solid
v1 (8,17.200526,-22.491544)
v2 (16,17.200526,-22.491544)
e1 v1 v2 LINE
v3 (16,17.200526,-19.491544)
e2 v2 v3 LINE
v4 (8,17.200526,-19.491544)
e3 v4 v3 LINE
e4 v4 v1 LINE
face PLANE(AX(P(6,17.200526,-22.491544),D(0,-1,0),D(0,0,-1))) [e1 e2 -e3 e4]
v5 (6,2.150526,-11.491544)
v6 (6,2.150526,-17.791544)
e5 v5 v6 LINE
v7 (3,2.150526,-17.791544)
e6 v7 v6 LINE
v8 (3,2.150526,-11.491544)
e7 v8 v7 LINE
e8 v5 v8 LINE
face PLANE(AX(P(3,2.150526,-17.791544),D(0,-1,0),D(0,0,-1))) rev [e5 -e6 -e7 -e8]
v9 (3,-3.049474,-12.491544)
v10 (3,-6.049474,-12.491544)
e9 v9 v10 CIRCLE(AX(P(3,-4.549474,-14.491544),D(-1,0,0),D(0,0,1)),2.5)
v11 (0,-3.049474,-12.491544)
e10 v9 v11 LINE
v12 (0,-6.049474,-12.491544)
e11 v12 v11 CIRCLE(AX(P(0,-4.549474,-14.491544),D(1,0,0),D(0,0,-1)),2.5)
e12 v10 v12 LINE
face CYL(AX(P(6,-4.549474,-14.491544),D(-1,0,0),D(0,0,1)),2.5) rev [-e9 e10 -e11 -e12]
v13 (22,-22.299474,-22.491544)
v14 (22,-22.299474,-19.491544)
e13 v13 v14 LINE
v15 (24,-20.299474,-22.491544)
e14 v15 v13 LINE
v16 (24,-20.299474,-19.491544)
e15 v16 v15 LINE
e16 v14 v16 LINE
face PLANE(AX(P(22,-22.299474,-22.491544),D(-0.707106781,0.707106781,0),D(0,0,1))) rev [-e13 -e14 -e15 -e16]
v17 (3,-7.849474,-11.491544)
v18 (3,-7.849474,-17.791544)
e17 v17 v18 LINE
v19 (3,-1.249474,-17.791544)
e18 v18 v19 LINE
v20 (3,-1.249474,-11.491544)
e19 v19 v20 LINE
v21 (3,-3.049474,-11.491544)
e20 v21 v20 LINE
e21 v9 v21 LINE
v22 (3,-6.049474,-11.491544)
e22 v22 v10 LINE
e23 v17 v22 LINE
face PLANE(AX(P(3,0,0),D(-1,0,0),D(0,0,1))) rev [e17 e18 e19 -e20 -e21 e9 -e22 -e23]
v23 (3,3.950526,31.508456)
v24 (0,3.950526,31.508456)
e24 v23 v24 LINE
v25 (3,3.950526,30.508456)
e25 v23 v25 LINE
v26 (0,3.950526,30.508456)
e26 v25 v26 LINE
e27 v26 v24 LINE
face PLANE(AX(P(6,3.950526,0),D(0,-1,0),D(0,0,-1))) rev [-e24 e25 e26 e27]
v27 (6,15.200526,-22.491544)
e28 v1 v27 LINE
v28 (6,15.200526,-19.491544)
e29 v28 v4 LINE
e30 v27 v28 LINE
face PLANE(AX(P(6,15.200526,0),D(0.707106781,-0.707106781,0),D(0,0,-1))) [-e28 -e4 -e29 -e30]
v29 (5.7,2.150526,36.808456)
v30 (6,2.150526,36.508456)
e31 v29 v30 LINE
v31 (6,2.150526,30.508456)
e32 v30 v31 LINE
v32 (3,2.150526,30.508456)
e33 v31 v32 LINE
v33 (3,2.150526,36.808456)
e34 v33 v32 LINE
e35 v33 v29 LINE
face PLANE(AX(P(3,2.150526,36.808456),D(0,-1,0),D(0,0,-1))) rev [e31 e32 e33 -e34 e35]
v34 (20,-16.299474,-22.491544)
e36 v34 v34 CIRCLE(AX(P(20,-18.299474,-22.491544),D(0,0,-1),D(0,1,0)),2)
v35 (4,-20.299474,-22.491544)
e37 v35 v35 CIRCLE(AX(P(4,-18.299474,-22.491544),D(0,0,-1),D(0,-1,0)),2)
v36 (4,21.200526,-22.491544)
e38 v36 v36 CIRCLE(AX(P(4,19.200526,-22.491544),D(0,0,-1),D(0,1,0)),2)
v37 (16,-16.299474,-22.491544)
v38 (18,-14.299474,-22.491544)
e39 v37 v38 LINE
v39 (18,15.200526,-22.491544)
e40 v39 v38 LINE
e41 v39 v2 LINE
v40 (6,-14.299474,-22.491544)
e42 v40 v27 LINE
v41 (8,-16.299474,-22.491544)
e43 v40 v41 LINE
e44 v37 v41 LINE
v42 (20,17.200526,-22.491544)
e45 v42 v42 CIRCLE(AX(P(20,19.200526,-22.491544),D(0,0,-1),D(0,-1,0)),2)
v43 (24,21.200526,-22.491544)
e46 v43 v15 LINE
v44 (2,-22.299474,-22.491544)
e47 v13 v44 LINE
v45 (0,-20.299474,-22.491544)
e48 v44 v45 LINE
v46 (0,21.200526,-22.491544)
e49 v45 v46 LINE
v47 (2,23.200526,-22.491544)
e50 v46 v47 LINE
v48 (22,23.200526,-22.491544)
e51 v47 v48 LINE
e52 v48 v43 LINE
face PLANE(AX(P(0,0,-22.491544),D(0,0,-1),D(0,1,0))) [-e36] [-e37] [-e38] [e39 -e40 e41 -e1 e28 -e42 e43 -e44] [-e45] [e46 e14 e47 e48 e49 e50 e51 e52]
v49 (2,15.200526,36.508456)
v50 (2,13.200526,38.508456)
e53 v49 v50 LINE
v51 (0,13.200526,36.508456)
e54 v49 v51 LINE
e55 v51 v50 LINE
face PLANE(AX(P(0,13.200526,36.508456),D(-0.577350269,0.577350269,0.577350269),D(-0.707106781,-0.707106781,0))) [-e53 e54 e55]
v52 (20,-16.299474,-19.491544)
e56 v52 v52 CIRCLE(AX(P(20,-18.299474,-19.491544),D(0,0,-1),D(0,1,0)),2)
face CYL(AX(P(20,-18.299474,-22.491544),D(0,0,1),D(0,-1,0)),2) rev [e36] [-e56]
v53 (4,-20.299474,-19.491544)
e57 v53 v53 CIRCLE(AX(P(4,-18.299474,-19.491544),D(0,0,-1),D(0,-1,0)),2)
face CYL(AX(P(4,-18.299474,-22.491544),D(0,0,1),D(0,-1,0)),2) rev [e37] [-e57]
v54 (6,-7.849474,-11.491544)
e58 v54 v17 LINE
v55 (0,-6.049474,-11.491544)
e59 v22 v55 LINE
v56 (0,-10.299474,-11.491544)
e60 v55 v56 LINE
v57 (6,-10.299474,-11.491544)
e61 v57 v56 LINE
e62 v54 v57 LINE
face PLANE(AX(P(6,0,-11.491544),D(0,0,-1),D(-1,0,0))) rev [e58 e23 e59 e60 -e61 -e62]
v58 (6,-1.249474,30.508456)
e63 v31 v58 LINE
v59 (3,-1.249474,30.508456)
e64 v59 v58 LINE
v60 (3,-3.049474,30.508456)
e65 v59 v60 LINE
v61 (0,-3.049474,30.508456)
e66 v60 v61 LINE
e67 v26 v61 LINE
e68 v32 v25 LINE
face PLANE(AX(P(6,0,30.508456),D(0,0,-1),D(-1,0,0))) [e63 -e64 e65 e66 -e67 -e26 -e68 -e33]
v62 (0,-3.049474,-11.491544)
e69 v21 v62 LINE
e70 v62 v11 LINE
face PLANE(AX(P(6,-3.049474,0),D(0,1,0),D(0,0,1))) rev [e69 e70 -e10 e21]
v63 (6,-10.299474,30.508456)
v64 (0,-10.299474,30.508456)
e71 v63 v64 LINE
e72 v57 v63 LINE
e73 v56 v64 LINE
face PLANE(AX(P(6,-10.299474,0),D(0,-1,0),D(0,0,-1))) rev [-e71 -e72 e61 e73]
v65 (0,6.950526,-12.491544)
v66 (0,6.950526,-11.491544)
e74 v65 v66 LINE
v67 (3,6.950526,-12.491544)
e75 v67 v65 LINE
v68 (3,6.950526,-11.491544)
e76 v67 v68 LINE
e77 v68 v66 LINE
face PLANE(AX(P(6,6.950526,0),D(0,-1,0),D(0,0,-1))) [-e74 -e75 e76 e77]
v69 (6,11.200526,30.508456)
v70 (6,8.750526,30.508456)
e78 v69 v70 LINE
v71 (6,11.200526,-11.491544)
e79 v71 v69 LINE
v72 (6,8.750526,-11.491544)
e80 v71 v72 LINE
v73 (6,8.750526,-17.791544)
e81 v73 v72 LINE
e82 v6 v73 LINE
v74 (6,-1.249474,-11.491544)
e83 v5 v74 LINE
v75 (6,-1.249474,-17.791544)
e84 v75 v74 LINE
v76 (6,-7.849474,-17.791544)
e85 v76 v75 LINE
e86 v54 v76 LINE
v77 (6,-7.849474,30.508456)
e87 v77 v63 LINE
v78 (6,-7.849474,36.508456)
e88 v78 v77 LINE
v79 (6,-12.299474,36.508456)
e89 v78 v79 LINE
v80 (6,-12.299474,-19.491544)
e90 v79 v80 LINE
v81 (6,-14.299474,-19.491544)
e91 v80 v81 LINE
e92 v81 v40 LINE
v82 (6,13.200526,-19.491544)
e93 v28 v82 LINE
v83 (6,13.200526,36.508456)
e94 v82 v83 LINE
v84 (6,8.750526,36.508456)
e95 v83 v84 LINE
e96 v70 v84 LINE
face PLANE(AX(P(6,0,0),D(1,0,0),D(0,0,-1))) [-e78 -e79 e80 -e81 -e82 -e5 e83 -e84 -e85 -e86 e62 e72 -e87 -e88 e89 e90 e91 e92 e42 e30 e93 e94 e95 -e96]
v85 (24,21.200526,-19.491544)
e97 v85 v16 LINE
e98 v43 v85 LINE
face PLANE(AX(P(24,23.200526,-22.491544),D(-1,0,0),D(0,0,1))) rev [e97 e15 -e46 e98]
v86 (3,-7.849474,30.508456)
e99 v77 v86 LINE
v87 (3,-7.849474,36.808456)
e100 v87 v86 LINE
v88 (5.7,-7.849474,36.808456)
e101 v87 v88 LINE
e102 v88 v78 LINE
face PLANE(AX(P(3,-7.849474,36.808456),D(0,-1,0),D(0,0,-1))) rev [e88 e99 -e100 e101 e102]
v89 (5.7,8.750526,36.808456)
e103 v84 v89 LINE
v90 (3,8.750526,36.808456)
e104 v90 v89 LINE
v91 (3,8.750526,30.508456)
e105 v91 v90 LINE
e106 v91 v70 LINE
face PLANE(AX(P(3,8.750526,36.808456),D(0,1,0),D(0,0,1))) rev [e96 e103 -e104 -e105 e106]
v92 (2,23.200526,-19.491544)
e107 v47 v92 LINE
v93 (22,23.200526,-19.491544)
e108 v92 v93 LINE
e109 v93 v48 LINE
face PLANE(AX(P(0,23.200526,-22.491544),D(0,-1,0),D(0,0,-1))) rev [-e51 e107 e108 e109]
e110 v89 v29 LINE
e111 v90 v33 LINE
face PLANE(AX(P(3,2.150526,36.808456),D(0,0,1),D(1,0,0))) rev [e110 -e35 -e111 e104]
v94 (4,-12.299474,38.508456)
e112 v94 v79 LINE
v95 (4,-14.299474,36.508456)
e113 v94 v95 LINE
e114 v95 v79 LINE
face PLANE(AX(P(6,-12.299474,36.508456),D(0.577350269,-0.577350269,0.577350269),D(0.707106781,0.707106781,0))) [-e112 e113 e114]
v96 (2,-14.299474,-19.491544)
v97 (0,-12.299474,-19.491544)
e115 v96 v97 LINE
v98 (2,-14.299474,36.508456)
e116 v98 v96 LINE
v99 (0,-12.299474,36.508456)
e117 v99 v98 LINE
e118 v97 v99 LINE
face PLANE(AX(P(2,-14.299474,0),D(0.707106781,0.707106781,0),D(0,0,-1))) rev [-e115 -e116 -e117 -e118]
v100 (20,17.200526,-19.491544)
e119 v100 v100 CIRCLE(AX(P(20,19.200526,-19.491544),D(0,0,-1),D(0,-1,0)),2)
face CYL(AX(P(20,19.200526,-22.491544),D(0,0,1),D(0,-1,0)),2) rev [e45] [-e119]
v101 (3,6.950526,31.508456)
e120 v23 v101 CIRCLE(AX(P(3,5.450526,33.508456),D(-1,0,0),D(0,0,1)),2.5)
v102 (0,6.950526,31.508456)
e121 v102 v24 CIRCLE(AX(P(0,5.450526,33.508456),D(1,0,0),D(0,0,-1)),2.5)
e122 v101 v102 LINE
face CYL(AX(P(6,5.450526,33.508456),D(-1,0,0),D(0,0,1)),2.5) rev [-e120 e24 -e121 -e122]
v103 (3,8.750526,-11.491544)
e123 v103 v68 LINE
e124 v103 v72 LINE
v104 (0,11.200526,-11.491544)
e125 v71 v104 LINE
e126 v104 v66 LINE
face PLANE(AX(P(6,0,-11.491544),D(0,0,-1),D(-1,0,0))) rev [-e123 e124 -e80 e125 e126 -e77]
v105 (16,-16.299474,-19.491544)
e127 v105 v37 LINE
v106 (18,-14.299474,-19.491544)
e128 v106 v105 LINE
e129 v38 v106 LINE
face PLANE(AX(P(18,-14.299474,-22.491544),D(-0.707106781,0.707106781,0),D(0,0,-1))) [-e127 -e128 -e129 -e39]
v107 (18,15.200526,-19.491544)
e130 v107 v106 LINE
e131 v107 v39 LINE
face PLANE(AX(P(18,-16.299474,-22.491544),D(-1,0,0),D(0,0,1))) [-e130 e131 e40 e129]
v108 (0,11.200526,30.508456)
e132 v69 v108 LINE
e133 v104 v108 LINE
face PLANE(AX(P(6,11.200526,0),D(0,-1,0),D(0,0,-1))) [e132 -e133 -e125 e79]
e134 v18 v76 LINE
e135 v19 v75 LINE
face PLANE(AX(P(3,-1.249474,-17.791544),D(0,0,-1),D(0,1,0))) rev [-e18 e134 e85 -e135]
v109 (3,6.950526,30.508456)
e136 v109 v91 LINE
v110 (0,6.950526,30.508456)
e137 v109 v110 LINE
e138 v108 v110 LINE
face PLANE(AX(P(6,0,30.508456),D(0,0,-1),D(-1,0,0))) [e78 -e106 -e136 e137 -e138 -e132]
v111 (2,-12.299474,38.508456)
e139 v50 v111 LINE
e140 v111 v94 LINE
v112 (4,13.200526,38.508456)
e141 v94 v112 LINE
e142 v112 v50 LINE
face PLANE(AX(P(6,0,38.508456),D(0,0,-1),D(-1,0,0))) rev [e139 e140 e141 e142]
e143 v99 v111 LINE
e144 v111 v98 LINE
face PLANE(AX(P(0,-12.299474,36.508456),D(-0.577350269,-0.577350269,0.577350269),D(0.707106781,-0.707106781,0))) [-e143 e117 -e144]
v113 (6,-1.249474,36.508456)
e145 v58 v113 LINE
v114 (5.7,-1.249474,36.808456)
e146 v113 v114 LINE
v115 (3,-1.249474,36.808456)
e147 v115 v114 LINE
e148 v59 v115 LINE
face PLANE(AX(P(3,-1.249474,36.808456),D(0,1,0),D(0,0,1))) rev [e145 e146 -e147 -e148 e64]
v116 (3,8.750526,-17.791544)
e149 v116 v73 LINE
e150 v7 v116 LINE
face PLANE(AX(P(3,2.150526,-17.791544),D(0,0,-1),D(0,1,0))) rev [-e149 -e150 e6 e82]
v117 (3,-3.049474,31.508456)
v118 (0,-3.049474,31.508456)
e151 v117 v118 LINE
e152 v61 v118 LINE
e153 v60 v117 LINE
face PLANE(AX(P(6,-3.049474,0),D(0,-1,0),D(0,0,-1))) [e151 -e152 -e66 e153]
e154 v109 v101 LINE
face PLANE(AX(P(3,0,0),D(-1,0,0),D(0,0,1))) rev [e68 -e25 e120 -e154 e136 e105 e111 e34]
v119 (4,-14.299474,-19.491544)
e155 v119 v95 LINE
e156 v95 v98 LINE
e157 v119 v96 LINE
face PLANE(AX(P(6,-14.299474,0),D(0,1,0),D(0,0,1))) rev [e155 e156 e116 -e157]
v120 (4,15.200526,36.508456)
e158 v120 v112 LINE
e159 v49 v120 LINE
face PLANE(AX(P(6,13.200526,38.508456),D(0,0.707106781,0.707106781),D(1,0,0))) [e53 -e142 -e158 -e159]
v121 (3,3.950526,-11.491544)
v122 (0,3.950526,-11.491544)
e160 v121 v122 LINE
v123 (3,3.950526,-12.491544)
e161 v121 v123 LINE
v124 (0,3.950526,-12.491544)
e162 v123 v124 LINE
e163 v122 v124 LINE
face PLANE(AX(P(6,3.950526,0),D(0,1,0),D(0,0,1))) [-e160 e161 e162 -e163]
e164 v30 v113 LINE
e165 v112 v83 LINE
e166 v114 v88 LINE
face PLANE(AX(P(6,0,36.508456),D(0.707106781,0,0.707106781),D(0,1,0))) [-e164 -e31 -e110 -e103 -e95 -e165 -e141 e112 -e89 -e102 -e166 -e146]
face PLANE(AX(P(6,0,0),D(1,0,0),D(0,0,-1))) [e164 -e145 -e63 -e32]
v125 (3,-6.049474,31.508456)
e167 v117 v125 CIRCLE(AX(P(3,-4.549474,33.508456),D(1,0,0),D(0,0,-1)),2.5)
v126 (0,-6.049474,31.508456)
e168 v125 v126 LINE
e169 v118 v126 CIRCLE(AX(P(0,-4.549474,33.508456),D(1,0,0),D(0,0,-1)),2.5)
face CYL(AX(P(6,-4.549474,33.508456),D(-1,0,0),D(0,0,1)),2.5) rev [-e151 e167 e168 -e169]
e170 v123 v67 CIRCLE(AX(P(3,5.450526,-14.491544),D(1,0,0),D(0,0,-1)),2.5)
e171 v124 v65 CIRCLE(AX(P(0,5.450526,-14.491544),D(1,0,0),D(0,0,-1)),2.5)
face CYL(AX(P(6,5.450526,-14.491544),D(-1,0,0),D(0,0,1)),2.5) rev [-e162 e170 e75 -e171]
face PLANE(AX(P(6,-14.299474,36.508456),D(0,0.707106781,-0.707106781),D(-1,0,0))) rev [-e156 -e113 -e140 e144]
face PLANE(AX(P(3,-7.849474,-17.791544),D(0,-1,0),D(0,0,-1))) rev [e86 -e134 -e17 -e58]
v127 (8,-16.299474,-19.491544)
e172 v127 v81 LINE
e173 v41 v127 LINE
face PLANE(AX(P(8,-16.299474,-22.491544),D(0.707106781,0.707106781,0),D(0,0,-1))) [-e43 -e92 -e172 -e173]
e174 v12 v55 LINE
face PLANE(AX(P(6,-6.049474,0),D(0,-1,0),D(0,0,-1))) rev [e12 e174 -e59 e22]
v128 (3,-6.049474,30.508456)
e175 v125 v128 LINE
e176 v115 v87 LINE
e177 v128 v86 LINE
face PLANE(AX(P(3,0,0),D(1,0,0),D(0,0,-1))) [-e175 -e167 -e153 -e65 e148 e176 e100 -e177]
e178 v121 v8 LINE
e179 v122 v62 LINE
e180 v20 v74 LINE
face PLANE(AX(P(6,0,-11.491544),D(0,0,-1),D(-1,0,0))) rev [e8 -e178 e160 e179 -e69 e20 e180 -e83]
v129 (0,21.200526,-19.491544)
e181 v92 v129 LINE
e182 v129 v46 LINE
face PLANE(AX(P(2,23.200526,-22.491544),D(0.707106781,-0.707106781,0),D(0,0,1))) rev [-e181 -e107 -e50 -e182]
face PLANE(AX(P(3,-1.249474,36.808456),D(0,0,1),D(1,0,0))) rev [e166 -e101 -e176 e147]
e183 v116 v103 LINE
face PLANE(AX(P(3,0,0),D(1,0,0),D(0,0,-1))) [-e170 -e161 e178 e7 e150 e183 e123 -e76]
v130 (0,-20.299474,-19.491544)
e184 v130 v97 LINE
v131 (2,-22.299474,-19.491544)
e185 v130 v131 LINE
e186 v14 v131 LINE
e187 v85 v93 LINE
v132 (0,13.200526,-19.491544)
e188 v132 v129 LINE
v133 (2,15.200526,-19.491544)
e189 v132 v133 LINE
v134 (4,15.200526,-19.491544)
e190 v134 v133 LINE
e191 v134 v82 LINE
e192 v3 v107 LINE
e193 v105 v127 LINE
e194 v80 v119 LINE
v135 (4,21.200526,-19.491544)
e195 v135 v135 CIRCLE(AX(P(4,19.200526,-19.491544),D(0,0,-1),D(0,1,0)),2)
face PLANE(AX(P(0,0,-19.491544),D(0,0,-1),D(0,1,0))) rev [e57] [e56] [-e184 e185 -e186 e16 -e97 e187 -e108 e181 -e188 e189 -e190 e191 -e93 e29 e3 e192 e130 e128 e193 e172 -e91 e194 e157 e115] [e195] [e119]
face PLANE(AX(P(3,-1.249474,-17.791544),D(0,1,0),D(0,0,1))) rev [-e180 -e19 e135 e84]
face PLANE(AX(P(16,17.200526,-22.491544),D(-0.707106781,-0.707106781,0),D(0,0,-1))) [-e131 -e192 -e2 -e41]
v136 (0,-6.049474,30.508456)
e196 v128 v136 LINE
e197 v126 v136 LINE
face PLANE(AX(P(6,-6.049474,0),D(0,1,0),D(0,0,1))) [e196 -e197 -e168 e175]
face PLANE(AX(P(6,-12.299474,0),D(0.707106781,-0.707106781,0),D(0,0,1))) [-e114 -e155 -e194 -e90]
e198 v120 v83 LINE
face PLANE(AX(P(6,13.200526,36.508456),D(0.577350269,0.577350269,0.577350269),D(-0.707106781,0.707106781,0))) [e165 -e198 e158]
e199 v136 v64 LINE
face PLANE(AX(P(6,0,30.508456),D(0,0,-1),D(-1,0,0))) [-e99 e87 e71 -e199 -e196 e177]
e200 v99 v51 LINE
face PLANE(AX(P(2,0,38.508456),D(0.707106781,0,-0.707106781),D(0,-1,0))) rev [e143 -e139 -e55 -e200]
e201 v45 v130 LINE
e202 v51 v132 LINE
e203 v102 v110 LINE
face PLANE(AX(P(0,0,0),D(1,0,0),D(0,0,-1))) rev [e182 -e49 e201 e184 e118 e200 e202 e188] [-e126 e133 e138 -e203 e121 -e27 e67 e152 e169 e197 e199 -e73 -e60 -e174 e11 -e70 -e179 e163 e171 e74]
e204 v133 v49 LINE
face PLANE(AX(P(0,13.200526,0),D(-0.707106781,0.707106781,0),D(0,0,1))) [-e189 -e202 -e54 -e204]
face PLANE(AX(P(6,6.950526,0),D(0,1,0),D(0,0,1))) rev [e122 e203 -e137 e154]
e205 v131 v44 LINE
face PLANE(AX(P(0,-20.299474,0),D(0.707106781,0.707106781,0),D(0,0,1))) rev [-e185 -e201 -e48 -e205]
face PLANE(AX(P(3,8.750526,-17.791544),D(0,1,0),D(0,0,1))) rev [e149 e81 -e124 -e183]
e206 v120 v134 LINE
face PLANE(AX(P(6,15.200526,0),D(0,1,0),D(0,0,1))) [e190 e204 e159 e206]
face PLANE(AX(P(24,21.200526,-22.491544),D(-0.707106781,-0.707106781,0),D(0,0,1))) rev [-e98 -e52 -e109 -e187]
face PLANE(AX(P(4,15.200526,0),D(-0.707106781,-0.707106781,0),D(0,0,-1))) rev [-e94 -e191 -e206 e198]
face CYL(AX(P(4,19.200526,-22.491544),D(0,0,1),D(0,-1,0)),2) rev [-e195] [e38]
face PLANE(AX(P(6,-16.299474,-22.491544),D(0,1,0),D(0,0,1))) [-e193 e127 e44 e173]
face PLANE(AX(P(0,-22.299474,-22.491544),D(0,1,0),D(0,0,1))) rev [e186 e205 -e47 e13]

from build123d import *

# Parameters (mm, degrees)
SKETCH1_W           = 58
SKETCH1_H           = 29.5
BOSS_EXTRUDE1_DEPTH = 6
SKETCH2_W           = 6.6
SKETCH2_H           = 6.6
CUT_EXTRUDE1_DEPTH  = 3
SKETCH3_W           = 24
SKETCH3_H           = 45.5
SKETCH3_R           = 2
SKETCH3_W_2         = 12
SKETCH3_H_2         = 33.5
BOSS_EXTRUDE2_DEPTH = 3
CHAMFER5_SIZE       = 2
CHAMFER6_SIZE       = 2
CHAMFER7_SIZE       = 2


with BuildPart() as part:
    # Sketch1 → Boss-Extrude1 (new body)
    with BuildSketch(Plane(origin=(0, 0, 0), x_dir=(0, 0, -1), z_dir=(1, 0, 0))):
        with Locations((-9.508456449, 0.450525737)):
            Rectangle(SKETCH1_W, SKETCH1_H)
        with BuildLine():
            Line((-31.508456449, 6.950525737), (-30.508456449, 6.950525737))
            Line((-30.508456449, 6.950525737), (-30.508456449, 11.200525737))
            Line((-30.508456449, 11.200525737), (11.491543551, 11.200525737))
            Line((11.491543551, 11.200525737), (11.491543551, 6.950525737))
            Line((11.491543551, 6.950525737), (12.491543551, 6.950525737))
            ThreePointArc((12.491543551, 6.950525737), (16.991543551, 5.450525737), (12.491543551, 3.950525737))
            Line((12.491543551, 3.950525737), (11.491543551, 3.950525737))
            Line((11.491543551, 3.950525737), (11.491543551, -3.049474263))
            Line((11.491543551, -3.049474263), (12.491543551, -3.049474263))
            ThreePointArc((12.491543551, -3.049474263), (16.991543551, -4.549474263), (12.491543551, -6.049474263))
            Line((12.491543551, -6.049474263), (11.491543551, -6.049474263))
            Line((11.491543551, -6.049474263), (11.491543551, -10.299474263))
            Line((11.491543551, -10.299474263), (-30.508456449, -10.299474263))
            Line((-30.508456449, -10.299474263), (-30.508456449, -6.049474263))
            Line((-30.508456449, -6.049474263), (-31.508456449, -6.049474263))
            ThreePointArc((-31.508456449, -6.049474263), (-36.008456449, -4.549474263), (-31.508456449, -3.049474263))
            Line((-31.508456449, -3.049474263), (-30.508456449, -3.049474263))
            Line((-30.508456449, -3.049474263), (-30.508456449, 3.950525737))
            Line((-30.508456449, 3.950525737), (-31.508456449, 3.950525737))
            ThreePointArc((-31.508456449, 3.950525737), (-36.008456449, 5.450525737), (-31.508456449, 6.950525737))
        make_face(mode=Mode.SUBTRACT)
    extrude(amount=BOSS_EXTRUDE1_DEPTH)

    # Sketch2 → Cut-Extrude1 (cut)
    with BuildSketch(Plane(origin=(6, 0, 0), x_dir=(0, 0, -1), z_dir=(1, 0, 0))):
        with Locations((-33.508456449, 5.450525737)):
            Rectangle(SKETCH2_W, SKETCH2_H)
        with Locations((14.491543551, 5.450525737)):
            Rectangle(SKETCH2_W, SKETCH2_H)
        with Locations((-33.508456449, -4.549474263)):
            Rectangle(SKETCH2_W, SKETCH2_H)
        with Locations((14.491543551, -4.549474263)):
            Rectangle(SKETCH2_W, SKETCH2_H)
    extrude(amount=-CUT_EXTRUDE1_DEPTH, mode=Mode.SUBTRACT)

    # Sketch3 → Boss-Extrude2 (add)
    with BuildSketch(Plane(origin=(0, 0, -19.491543551), x_dir=(-1, 0, 0), z_dir=(0, 0, -1))):
        with Locations((-12, 0.450525737)):
            Rectangle(SKETCH3_W, SKETCH3_H)
        with Locations(Location((-4, 19.200525737, 0), (0, 0, 90))):
            Circle(SKETCH3_R, mode=Mode.SUBTRACT)
        with Locations(Location((-20, 19.200525737, 0), (0, 0, 270))):
            Circle(SKETCH3_R, mode=Mode.SUBTRACT)
        with Locations(Location((-20, -18.299474263, 0), (0, 0, 90))):
            Circle(SKETCH3_R, mode=Mode.SUBTRACT)
        with Locations(Location((-4, -18.299474263, 0), (0, 0, 270))):
            Circle(SKETCH3_R, mode=Mode.SUBTRACT)
        with Locations((-12, 0.450525737)):
            Rectangle(SKETCH3_W_2, SKETCH3_H_2, mode=Mode.SUBTRACT)
    extrude(amount=BOSS_EXTRUDE2_DEPTH)

    # Chamfer5
    chamfer5_edges = [part.edges().sort_by_distance(p)[0] for p in [
        (6, 17.200525737, -20.991543551),
        (18, 17.200525737, -20.991543551),
        (18, -16.299474263, -20.991543551),
        (6, -16.299474263, -20.991543551),
    ]]
    chamfer(chamfer5_edges, length=CHAMFER5_SIZE)

    # Chamfer6
    chamfer6_edges = [part.edges().sort_by_distance(p)[0] for p in [
        (24, -22.299474263, -20.991543551),
        (0, -22.299474263, -20.991543551),
        (0, 23.200525737, -20.991543551),
        (24, 23.200525737, -20.991543551),
    ]]
    chamfer(chamfer6_edges, length=CHAMFER6_SIZE)

    # Chamfer7
    # the kernel refuses this chamfer: 2 mm, written as the material it takes off along each edge
    with BuildSketch(Plane(origin=(4.666666667, 13.867192404, 37.175123115), x_dir=(0.7071067811865474, -0.7071067811865477, 0), z_dir=(0.577350269189626, 0.5773502691896257, 0.5773502691896257)), Plane(origin=(1.333333333, 13.867192404, 37.175123115), x_dir=(0.7071067811865477, 0.7071067811865474, 0), z_dir=(-0.5773502691896256, 0.5773502691896258, 0.5773502691896258))) as chamfer7_piece_1:
        Polygon((-1.414213562, 0.816496581), (1.414213562, 0.816496581), (0, -1.632993162), align=None)
    extrude(amount=2.540341184, mode=Mode.SUBTRACT)
    with BuildSketch(Plane(origin=(4.666666667, -12.966140929, 37.175123115), x_dir=(0.7071067811865474, 0.7071067811865477, 0), z_dir=(0.577350269189626, -0.5773502691896257, 0.5773502691896257)), Plane(origin=(1.333333333, -12.966140929, 37.175123115), x_dir=(0.7071067811865477, -0.7071067811865474, 0), z_dir=(-0.5773502691896256, -0.5773502691896258, 0.5773502691896258))) as chamfer7_piece_2:
        Polygon((-1.414213562, -0.816496581), (1.414213562, -0.816496581), (0, 1.632993162), align=None)
    extrude(amount=2.540341184, mode=Mode.SUBTRACT)
    with BuildSketch(Plane(origin=(6, 15.200525737, 43.651822425), x_dir=(-0.9996219169112968, 0.027495876610586494, 0), z_dir=(0, 0, -1)), Plane(origin=(6, -14.299474263, -19.491543551), x_dir=(-0.9996219169112968, -0.027495876610586494, 0), z_dir=(0, 0, 1)), Plane(origin=(0, -14.299474263, -19.491543551), x_dir=(-0.027495876610586795, 0.9996219169112968, 0), z_dir=(0, 0, 1)), Plane(origin=(0, 15.200525737, 43.651822425), x_dir=(-0.027495876610586365, -0.9996219169112968, 0), z_dir=(0, 0, -1))) as chamfer7_piece_3:
        Polygon((CHAMFER7_SIZE * 0.999621916911, -CHAMFER7_SIZE * 0.0274958766106), (-CHAMFER7_SIZE * 0.0274958766106, -CHAMFER7_SIZE * 0.999621916911), (0, 0), align=None)
    extrude(amount=63.143365976, mode=Mode.SUBTRACT)
    with BuildSketch(Plane(origin=(6, -19.442840238, 38.508456449), x_dir=(-0.9996219169112968, 0, 0.02749587661058563), z_dir=(0, 1, 0)), Plane(origin=(0, -19.442840238, 38.508456449), x_dir=(-0.02749587661058639, 0, -0.9996219169112968), z_dir=(0, 1, 0))) as chamfer7_piece_4:
        Polygon((CHAMFER7_SIZE * 0.999621916911, -CHAMFER7_SIZE * 0.0274958766106), (-CHAMFER7_SIZE * 0.0274958766106, -CHAMFER7_SIZE * 0.999621916911), (0, 0), align=None)
    extrude(amount=39.786731952, mode=Mode.SUBTRACT)
    with BuildSketch(Plane(origin=(-5.143365976, -14.299474263, 38.508456449), x_dir=(0, -0.02749587661058651, -0.9996219169112968), z_dir=(1, 0, 0))) as chamfer7_piece_5:
        Polygon((CHAMFER7_SIZE * 0.999621916911, CHAMFER7_SIZE * 0.0274958766106), (-CHAMFER7_SIZE * 0.0274958766106, CHAMFER7_SIZE * 0.999621916911), (0, 0), align=None)
    extrude(amount=16.286731952, mode=Mode.SUBTRACT)
    with BuildSketch(Plane(origin=(-5.143365976, 15.200525737, 38.508456449), x_dir=(0, 0.02749587661058651, -0.9996219169112968), z_dir=(1, 0, 0))) as chamfer7_piece_6:
        Polygon((CHAMFER7_SIZE * 0.999621916911, -CHAMFER7_SIZE * 0.0274958766106), (-CHAMFER7_SIZE * 0.0274958766106, -CHAMFER7_SIZE * 0.999621916911), (0, 0), align=None)
    extrude(amount=16.286731952, mode=Mode.SUBTRACT)


solid = part.part
